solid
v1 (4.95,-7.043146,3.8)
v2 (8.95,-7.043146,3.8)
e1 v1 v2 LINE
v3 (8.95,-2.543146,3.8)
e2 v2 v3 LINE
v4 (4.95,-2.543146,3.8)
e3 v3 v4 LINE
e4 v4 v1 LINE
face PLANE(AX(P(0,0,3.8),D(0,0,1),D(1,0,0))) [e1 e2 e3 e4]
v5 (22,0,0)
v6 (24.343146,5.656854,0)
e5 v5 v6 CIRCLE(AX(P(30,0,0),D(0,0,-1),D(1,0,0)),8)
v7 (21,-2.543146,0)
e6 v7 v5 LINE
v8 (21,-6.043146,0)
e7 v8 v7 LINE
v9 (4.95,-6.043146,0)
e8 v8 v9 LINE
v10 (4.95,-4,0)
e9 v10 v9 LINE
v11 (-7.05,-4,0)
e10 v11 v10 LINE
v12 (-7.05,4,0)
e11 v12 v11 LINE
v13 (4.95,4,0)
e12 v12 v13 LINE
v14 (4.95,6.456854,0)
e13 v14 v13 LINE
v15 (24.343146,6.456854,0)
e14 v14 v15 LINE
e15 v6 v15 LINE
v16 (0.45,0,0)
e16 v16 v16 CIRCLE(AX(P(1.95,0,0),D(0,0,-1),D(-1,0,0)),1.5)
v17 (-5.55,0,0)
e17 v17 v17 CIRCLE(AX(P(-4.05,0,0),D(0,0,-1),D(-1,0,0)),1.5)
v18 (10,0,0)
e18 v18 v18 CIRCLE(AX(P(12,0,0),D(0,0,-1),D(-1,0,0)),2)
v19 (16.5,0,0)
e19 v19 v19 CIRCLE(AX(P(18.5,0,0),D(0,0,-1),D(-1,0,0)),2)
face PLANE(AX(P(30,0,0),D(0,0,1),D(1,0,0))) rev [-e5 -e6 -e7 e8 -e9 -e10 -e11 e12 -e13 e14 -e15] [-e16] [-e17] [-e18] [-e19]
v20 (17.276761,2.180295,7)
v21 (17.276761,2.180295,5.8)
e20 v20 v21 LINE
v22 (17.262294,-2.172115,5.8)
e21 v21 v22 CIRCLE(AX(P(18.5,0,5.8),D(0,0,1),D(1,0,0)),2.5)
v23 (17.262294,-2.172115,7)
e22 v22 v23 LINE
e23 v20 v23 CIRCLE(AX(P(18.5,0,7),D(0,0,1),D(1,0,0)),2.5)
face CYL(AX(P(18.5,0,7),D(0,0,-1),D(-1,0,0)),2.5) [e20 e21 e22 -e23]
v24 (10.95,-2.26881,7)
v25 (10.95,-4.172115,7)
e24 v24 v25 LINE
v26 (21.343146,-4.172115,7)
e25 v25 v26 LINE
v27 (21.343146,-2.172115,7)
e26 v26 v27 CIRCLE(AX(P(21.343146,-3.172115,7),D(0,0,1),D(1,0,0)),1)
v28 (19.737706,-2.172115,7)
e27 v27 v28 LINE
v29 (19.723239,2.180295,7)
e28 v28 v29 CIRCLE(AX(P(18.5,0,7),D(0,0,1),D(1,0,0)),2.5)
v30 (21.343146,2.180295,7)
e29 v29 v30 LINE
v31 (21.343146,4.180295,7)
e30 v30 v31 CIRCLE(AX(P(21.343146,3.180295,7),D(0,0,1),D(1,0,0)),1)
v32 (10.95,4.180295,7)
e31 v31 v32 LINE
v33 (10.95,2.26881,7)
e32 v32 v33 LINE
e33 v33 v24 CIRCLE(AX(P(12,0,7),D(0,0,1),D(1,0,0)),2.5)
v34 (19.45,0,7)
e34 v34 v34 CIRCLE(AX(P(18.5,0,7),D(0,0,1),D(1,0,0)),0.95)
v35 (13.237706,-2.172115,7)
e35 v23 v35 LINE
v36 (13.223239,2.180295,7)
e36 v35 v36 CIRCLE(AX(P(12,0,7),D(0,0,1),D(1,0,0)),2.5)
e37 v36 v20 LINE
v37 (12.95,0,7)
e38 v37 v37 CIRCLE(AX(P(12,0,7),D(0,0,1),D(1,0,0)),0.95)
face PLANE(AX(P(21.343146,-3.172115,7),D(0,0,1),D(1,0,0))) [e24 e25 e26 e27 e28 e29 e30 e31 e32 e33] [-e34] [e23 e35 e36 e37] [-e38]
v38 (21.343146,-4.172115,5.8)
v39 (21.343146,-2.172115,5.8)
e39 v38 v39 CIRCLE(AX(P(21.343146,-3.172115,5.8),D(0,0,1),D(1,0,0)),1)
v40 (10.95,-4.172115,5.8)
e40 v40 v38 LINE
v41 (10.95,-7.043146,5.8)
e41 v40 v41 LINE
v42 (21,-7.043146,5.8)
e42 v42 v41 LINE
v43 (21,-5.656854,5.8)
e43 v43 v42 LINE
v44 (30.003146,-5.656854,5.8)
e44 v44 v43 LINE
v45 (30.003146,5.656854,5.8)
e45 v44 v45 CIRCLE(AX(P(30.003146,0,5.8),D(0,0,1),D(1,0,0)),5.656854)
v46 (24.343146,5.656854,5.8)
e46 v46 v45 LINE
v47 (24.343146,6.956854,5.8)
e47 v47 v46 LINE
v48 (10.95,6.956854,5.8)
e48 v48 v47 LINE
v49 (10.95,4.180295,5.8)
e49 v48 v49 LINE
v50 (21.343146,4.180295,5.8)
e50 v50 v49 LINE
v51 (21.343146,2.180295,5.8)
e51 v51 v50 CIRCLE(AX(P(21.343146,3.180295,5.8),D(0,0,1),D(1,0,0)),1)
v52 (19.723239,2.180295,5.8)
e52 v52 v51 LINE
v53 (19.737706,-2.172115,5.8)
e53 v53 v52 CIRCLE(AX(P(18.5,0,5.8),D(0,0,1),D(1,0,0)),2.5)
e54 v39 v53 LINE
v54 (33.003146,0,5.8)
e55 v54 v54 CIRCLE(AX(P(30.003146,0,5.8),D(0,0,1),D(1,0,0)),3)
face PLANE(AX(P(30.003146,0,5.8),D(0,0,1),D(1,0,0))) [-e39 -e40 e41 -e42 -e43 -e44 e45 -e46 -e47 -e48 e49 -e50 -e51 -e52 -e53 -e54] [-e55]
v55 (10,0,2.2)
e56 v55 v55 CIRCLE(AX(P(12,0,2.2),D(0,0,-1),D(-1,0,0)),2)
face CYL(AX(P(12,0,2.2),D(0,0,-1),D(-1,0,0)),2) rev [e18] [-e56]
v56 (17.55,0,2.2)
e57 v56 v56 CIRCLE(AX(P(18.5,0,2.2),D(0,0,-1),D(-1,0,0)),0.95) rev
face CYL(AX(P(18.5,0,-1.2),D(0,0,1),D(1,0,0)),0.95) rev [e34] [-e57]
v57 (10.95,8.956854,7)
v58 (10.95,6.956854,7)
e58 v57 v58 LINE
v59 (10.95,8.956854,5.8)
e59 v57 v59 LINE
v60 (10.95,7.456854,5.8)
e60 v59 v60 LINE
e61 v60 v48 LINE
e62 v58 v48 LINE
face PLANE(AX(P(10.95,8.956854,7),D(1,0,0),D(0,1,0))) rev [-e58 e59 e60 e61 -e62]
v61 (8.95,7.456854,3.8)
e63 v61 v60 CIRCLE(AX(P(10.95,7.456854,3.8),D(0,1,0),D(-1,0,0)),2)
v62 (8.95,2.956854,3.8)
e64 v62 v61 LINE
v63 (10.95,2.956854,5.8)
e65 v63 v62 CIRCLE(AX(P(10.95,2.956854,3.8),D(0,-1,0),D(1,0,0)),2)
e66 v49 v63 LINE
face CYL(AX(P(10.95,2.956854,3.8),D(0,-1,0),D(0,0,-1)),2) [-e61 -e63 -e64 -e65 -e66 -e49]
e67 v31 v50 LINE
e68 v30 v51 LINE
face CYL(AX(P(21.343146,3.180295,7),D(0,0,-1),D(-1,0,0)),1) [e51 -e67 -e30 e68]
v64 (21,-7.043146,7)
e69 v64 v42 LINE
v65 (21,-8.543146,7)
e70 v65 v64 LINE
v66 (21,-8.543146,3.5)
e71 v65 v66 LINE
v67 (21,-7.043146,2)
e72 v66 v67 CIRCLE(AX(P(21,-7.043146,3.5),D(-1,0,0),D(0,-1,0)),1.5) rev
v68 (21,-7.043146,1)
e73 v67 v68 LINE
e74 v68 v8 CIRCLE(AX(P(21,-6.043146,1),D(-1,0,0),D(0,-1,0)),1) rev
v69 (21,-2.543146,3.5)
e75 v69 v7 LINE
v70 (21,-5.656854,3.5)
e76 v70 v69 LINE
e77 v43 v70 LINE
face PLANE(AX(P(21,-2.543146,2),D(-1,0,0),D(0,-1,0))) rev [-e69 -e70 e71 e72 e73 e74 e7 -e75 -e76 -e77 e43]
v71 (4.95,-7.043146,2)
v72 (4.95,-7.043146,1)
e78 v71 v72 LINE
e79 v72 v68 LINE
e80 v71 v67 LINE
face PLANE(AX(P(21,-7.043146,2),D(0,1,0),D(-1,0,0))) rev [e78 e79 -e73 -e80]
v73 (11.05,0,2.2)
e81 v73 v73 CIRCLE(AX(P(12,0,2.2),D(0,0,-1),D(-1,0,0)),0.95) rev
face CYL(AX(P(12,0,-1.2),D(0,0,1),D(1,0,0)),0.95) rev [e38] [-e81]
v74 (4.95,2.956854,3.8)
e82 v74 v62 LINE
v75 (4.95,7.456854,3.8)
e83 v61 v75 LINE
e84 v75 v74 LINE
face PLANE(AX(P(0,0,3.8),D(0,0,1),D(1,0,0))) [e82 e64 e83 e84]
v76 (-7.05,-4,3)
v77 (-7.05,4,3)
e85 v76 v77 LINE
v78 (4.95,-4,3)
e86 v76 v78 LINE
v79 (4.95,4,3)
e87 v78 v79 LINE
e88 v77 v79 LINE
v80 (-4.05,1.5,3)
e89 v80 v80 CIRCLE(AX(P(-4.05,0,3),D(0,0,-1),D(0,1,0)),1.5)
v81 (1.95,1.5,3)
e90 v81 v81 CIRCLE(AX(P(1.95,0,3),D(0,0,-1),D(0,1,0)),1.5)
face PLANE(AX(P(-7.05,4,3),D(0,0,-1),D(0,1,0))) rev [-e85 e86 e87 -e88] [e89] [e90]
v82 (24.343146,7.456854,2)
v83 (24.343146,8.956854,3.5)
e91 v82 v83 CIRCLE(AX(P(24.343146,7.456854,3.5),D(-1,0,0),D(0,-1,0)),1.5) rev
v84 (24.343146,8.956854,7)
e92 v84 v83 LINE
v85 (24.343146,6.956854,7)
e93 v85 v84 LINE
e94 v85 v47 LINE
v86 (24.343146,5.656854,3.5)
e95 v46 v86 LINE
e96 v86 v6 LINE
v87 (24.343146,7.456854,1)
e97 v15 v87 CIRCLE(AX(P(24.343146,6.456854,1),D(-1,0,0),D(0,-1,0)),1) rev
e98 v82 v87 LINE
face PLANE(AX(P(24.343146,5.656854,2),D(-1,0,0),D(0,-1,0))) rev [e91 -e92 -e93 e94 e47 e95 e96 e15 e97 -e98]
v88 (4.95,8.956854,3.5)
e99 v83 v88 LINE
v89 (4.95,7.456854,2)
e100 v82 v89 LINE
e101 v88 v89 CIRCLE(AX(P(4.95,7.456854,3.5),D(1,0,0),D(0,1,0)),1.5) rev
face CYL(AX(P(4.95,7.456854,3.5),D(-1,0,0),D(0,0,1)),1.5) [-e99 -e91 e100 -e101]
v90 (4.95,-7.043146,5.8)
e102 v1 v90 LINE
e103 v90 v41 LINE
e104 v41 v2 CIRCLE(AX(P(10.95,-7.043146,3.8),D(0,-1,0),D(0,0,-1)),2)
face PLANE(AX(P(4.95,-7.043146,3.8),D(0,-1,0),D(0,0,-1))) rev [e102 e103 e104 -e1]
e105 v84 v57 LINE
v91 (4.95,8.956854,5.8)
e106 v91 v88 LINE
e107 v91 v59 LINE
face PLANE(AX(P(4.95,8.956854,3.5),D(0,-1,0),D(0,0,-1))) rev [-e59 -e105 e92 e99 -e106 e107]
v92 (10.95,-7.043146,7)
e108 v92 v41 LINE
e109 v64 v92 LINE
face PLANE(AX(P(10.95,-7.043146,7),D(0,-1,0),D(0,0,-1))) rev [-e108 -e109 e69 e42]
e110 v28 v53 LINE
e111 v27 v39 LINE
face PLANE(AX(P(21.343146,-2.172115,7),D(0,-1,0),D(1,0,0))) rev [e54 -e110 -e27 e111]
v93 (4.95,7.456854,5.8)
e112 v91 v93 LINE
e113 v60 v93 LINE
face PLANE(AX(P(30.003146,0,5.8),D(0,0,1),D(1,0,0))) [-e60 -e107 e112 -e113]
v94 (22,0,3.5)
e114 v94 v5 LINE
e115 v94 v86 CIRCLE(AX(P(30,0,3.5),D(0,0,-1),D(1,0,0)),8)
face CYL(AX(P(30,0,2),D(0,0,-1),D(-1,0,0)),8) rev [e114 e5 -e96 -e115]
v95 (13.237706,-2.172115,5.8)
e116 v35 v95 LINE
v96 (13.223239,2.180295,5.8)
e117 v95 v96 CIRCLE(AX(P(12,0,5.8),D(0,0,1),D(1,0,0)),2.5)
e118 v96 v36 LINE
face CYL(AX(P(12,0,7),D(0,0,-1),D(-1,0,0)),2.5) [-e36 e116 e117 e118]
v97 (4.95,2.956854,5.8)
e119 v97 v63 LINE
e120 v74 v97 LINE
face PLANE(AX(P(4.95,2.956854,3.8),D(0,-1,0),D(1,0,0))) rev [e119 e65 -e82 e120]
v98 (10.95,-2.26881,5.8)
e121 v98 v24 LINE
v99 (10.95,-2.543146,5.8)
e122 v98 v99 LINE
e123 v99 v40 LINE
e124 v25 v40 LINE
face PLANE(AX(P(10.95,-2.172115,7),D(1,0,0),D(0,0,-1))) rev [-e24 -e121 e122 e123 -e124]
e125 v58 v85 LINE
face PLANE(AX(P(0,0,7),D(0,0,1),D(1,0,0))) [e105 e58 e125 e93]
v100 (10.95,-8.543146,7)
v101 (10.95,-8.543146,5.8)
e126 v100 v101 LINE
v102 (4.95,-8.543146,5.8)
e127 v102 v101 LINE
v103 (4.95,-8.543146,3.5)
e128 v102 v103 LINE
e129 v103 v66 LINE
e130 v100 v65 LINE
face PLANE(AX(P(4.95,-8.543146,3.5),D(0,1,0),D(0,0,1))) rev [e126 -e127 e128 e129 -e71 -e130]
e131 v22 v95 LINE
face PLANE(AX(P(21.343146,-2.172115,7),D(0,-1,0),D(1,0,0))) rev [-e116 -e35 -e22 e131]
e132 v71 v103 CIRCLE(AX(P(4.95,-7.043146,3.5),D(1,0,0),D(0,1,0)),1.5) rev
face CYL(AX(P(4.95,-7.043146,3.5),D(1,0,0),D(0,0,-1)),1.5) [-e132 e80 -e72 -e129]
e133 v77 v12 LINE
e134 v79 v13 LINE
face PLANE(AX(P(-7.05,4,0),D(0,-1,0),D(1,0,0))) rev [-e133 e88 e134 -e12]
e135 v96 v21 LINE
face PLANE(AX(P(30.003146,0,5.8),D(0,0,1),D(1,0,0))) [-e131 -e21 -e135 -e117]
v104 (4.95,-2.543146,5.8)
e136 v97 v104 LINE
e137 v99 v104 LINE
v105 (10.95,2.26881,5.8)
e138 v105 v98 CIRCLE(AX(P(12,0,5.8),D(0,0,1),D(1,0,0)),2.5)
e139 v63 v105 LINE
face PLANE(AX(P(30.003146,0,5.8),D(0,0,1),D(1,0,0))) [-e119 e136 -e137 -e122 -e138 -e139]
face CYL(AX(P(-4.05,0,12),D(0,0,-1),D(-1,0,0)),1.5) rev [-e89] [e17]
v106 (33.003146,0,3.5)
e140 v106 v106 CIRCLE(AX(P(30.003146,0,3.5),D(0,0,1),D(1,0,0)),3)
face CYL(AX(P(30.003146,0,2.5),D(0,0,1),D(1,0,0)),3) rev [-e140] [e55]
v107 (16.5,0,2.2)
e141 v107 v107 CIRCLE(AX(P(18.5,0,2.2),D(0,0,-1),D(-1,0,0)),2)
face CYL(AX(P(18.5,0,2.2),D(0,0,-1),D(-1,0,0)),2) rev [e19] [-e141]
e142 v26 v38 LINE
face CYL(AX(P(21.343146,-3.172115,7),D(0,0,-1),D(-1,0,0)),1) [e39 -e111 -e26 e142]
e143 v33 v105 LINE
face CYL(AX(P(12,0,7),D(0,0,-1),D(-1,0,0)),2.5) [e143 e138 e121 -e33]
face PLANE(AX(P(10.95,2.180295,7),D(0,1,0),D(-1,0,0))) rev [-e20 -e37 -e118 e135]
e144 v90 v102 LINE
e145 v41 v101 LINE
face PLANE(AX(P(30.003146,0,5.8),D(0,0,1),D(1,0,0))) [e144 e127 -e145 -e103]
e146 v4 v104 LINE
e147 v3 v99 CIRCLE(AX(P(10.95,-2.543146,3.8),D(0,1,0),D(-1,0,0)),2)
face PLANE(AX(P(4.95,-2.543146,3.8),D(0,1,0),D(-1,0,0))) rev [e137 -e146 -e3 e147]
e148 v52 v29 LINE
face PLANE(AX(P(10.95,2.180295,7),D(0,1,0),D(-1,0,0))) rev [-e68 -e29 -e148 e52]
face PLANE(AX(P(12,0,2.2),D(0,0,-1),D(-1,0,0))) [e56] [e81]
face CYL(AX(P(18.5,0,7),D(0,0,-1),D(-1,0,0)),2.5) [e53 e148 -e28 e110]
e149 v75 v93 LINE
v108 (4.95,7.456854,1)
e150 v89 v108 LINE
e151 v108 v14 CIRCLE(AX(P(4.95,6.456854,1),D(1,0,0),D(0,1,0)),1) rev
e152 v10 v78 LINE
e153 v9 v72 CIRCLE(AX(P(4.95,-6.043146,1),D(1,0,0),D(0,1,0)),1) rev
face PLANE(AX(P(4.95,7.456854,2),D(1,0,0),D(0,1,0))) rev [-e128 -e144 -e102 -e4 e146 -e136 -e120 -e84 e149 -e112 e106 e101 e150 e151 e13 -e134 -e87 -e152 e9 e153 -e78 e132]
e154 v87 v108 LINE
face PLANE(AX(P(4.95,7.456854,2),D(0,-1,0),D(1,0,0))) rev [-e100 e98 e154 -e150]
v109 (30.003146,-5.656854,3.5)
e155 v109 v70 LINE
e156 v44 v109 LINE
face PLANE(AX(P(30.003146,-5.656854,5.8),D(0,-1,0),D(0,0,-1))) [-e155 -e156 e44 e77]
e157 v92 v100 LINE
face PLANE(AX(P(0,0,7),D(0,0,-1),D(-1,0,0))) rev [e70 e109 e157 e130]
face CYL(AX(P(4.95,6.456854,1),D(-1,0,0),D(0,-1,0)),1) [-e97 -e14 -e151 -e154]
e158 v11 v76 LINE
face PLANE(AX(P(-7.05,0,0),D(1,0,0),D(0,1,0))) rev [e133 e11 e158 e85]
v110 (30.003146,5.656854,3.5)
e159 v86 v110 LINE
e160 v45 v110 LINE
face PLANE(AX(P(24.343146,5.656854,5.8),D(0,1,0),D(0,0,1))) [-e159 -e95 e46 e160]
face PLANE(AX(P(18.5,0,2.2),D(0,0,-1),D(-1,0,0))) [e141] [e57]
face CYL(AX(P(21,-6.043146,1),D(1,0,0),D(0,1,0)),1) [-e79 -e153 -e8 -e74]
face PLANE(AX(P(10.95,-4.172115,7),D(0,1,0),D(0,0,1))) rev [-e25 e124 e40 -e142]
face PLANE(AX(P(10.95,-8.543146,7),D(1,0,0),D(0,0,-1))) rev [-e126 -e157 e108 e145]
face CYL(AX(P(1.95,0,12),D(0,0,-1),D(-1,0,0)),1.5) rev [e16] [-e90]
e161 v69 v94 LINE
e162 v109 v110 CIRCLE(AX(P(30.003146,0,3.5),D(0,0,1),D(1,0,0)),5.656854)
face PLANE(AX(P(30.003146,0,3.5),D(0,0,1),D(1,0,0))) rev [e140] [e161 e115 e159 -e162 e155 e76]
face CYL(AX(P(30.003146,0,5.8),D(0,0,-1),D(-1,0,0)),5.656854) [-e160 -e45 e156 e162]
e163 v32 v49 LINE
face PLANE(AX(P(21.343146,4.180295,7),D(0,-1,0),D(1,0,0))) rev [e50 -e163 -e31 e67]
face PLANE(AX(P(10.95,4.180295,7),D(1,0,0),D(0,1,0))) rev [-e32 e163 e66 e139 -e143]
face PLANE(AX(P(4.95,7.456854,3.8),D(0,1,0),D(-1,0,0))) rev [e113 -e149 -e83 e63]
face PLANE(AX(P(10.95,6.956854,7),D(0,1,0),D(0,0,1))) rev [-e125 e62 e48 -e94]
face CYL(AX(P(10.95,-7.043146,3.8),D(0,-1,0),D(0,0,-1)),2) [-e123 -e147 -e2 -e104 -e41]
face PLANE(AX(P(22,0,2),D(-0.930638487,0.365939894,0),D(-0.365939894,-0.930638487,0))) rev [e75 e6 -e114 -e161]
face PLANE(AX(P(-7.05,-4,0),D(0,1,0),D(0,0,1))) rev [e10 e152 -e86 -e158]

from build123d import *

# Parameters (mm, degrees)
BOSS_EXTRUDE1_DEPTH = 2
BOSS_EXTRUDE2_DEPTH = 1.5
BOSS_EXTRUDE3_DEPTH = 2.3
SKETCH6_W           = 4
SKETCH6_H           = 4.5
CUT_EXTRUDE1_DEPTH  = 2
SKETCH7_R           = 3
CUT_EXTRUDE2_DEPTH  = 3.3
SKETCH8_W           = 13.393145751
SKETCH8_H           = 2
SKETCH8_W_2         = 10.05
SKETCH8_H_2         = 1.5
BOSS_EXTRUDE4_DEPTH = 1.2
SKETCH9_R           = 2.5
BOSS_EXTRUDE5_DEPTH = 1.2
SKETCH10_R          = 0.95
CUT_EXTRUDE3_DEPTH  = 8.2
SKETCH11_R          = 2
CUT_EXTRUDE4_DEPTH  = 2.2
FILLET1_R           = 1.5
FILLET2_R           = 1
FILLET3_R           = 2
SKETCH13_W          = 3
SKETCH13_H          = 8
BOSS_EXTRUDE6_DEPTH = 12
SKETCH14_R          = 1.5
CUT_EXTRUDE5_DEPTH  = 12


with BuildPart() as part:
    # Sketch2 → Boss-Extrude1 (new body)
    with BuildSketch(Plane.XY):
        with BuildLine():
            Line((4.95, 7.456854249), (24.343145751, 7.456854249))
            Line((24.343145751, 7.456854249), (24.343145751, 5.656854249))
            ThreePointArc((24.343145751, 5.656854249), (22.60896374, 3.061467459), (22, 0))
            Line((22, 0), (21, -2.543145751))
            Line((21, -2.543145751), (21, -7.043145751))
            Line((21, -7.043145751), (8.499747468, -7.043145751))
            Line((8.499747468, -7.043145751), (4.95, -7.043145751))
            Line((4.95, -7.043145751), (4.95, 7.456854249))
        make_face()
    extrude(amount=BOSS_EXTRUDE1_DEPTH)

    # Sketch3 → Boss-Extrude2 (add)
    with BuildSketch(Plane.XY.offset(2)):
        with BuildLine():
            Line((24.343145751, 7.456854249), (24.343145751, 5.656854249))
            ThreePointArc((24.343145751, 5.656854249), (22.60896374, 3.061467459), (22, 0))
            Line((22, 0), (21, -2.543145751))
            Line((21, -2.543145751), (21, -7.043145751))
            Line((21, -7.043145751), (21, -8.543145751))
            Line((21, -8.543145751), (4.95, -8.543145751))
            Line((4.95, -8.543145751), (4.95, 8.956854249))
            Line((4.95, 8.956854249), (24.343145751, 8.956854249))
            Line((24.343145751, 8.956854249), (24.343145751, 7.456854249))
        make_face()
    extrude(amount=BOSS_EXTRUDE2_DEPTH)

    # Sketch5 → Boss-Extrude3 (add)
    with BuildSketch(Plane.XY.offset(3.5)):
        with BuildLine():
            Line((4.95, -8.543145751), (21, -8.543145751))
            Line((21, -8.543145751), (21, -5.656854249))
            Line((21, -5.656854249), (30.003145751, -5.656854249))
            ThreePointArc((30.003145751, -5.656854249), (35.66, 0), (30.003145751, 5.656854249))
            Line((30.003145751, 5.656854249), (24.343145751, 5.656854249))
            Line((24.343145751, 5.656854249), (24.343145751, 7.5))
            Line((24.343145751, 7.5), (24.343145751, 8.956854249))
            Line((24.343145751, 8.956854249), (4.95, 8.956854249))
            Line((4.95, 8.956854249), (4.95, -8.543145751))
        make_face()
    extrude(amount=BOSS_EXTRUDE3_DEPTH)

    # Sketch6 → Cut-Extrude1 (cut)
    with BuildSketch(Plane.XY.offset(5.8)):
        with Locations((6.95, 5.206854249)):
            Rectangle(SKETCH6_W, SKETCH6_H)
        with Locations((6.95, -4.793145751)):
            Rectangle(SKETCH6_W, SKETCH6_H)
    extrude(amount=-CUT_EXTRUDE1_DEPTH, mode=Mode.SUBTRACT)

    # Sketch7 → Cut-Extrude2 (cut)
    with BuildSketch(Plane.XY.offset(5.8)):
        with Locations((30.003145751, 0)):
            Circle(SKETCH7_R)
    extrude(amount=-CUT_EXTRUDE2_DEPTH, mode=Mode.SUBTRACT)

    # Sketch8 → Boss-Extrude4 (add)
    with BuildSketch(Plane.XY.offset(5.8)):
        with Locations((17.646572876, 7.956854249)):
            Rectangle(SKETCH8_W, SKETCH8_H)
        with Locations((15.975, -7.793145751)):
            Rectangle(SKETCH8_W_2, SKETCH8_H_2)
        with BuildLine():
            Line((10.95, -4.172114809), (21.343145751, -4.172114809))
            ThreePointArc((21.343145751, -4.172114809), (22.343145751, -3.172114809), (21.343145751, -2.172114809))
            Line((21.343145751, -2.172114809), (10.95, -2.172114809))
            Line((10.95, -2.172114809), (10.95, -4.172114809))
        make_face()
        with BuildLine():
            Line((21.343145751, 4.180295218), (10.95, 4.180295218))
            Line((10.95, 4.180295218), (10.95, 2.180295218))
            Line((10.95, 2.180295218), (21.343145751, 2.180295218))
            ThreePointArc((21.343145751, 2.180295218), (22.343145751, 3.180295218), (21.343145751, 4.180295218))
        make_face()
    extrude(amount=BOSS_EXTRUDE4_DEPTH)

    # Sketch9 → Boss-Extrude5 (add)
    with BuildSketch(Plane.XY.offset(5.8)):
        with Locations((18.5, 0)):
            Circle(SKETCH9_R)
        with Locations((12, 0)):
            Circle(SKETCH9_R)
    extrude(amount=BOSS_EXTRUDE5_DEPTH)

    # Sketch10 → Cut-Extrude3 (cut)
    with BuildSketch(Plane.XY.offset(7)):
        with Locations((18.5, 0)):
            Circle(SKETCH10_R)
        with Locations((12, 0)):
            Circle(SKETCH10_R)
    extrude(amount=-CUT_EXTRUDE3_DEPTH, mode=Mode.SUBTRACT)

    # Sketch11 → Cut-Extrude4 (cut)
    with BuildSketch(Plane(origin=(0, 0, 0), x_dir=(-1, 0, 0), z_dir=(0, 0, -1))):
        with Locations((-12, 0)):
            Circle(SKETCH11_R)
        with Locations((-18.5, 0)):
            Circle(SKETCH11_R)
    extrude(amount=-CUT_EXTRUDE4_DEPTH, mode=Mode.SUBTRACT)

    # Fillet1
    fillet1_edges = [part.edges().sort_by_distance(p)[0] for p in [
        (14.646572875, 8.956854249, 2),
        (12.975, -8.543145751, 2),
    ]]
    fillet(fillet1_edges, radius=FILLET1_R - 0.0001)  # a hair under: the kernel refuses the full size

    # Fillet2
    fillet2_edges = [part.edges().sort_by_distance(p)[0] for p in [
        (12.975, -7.043145751, 0),
        (14.646572875, 7.456854249, 0),
    ]]
    fillet(fillet2_edges, radius=FILLET2_R)

    # Fillet3
    fillet3_edges = [part.edges().sort_by_distance(p)[0] for p in [
        (8.95, -4.793145751, 5.8),
        (8.95, 5.206854249, 5.8),
    ]]
    fillet(fillet3_edges, radius=FILLET3_R - 0.0001)  # a hair under: the kernel refuses the full size

    # Sketch13 → Boss-Extrude6 (add)
    with BuildSketch(Plane.ZY.offset(-4.95)):
        with Locations((1.5, 0)):
            Rectangle(SKETCH13_W, SKETCH13_H)
    extrude(amount=BOSS_EXTRUDE6_DEPTH)

    # Sketch14 → Cut-Extrude5 (cut)
    with BuildSketch(Plane(origin=(0, 0, 0), x_dir=(-1, 0, 0), z_dir=(0, 0, -1))):
        with Locations((-1.95, 0)):
            Circle(SKETCH14_R)
        with Locations((4.05, 0)):
            Circle(SKETCH14_R)
    extrude(amount=-CUT_EXTRUDE5_DEPTH, mode=Mode.SUBTRACT)


solid = part.part
